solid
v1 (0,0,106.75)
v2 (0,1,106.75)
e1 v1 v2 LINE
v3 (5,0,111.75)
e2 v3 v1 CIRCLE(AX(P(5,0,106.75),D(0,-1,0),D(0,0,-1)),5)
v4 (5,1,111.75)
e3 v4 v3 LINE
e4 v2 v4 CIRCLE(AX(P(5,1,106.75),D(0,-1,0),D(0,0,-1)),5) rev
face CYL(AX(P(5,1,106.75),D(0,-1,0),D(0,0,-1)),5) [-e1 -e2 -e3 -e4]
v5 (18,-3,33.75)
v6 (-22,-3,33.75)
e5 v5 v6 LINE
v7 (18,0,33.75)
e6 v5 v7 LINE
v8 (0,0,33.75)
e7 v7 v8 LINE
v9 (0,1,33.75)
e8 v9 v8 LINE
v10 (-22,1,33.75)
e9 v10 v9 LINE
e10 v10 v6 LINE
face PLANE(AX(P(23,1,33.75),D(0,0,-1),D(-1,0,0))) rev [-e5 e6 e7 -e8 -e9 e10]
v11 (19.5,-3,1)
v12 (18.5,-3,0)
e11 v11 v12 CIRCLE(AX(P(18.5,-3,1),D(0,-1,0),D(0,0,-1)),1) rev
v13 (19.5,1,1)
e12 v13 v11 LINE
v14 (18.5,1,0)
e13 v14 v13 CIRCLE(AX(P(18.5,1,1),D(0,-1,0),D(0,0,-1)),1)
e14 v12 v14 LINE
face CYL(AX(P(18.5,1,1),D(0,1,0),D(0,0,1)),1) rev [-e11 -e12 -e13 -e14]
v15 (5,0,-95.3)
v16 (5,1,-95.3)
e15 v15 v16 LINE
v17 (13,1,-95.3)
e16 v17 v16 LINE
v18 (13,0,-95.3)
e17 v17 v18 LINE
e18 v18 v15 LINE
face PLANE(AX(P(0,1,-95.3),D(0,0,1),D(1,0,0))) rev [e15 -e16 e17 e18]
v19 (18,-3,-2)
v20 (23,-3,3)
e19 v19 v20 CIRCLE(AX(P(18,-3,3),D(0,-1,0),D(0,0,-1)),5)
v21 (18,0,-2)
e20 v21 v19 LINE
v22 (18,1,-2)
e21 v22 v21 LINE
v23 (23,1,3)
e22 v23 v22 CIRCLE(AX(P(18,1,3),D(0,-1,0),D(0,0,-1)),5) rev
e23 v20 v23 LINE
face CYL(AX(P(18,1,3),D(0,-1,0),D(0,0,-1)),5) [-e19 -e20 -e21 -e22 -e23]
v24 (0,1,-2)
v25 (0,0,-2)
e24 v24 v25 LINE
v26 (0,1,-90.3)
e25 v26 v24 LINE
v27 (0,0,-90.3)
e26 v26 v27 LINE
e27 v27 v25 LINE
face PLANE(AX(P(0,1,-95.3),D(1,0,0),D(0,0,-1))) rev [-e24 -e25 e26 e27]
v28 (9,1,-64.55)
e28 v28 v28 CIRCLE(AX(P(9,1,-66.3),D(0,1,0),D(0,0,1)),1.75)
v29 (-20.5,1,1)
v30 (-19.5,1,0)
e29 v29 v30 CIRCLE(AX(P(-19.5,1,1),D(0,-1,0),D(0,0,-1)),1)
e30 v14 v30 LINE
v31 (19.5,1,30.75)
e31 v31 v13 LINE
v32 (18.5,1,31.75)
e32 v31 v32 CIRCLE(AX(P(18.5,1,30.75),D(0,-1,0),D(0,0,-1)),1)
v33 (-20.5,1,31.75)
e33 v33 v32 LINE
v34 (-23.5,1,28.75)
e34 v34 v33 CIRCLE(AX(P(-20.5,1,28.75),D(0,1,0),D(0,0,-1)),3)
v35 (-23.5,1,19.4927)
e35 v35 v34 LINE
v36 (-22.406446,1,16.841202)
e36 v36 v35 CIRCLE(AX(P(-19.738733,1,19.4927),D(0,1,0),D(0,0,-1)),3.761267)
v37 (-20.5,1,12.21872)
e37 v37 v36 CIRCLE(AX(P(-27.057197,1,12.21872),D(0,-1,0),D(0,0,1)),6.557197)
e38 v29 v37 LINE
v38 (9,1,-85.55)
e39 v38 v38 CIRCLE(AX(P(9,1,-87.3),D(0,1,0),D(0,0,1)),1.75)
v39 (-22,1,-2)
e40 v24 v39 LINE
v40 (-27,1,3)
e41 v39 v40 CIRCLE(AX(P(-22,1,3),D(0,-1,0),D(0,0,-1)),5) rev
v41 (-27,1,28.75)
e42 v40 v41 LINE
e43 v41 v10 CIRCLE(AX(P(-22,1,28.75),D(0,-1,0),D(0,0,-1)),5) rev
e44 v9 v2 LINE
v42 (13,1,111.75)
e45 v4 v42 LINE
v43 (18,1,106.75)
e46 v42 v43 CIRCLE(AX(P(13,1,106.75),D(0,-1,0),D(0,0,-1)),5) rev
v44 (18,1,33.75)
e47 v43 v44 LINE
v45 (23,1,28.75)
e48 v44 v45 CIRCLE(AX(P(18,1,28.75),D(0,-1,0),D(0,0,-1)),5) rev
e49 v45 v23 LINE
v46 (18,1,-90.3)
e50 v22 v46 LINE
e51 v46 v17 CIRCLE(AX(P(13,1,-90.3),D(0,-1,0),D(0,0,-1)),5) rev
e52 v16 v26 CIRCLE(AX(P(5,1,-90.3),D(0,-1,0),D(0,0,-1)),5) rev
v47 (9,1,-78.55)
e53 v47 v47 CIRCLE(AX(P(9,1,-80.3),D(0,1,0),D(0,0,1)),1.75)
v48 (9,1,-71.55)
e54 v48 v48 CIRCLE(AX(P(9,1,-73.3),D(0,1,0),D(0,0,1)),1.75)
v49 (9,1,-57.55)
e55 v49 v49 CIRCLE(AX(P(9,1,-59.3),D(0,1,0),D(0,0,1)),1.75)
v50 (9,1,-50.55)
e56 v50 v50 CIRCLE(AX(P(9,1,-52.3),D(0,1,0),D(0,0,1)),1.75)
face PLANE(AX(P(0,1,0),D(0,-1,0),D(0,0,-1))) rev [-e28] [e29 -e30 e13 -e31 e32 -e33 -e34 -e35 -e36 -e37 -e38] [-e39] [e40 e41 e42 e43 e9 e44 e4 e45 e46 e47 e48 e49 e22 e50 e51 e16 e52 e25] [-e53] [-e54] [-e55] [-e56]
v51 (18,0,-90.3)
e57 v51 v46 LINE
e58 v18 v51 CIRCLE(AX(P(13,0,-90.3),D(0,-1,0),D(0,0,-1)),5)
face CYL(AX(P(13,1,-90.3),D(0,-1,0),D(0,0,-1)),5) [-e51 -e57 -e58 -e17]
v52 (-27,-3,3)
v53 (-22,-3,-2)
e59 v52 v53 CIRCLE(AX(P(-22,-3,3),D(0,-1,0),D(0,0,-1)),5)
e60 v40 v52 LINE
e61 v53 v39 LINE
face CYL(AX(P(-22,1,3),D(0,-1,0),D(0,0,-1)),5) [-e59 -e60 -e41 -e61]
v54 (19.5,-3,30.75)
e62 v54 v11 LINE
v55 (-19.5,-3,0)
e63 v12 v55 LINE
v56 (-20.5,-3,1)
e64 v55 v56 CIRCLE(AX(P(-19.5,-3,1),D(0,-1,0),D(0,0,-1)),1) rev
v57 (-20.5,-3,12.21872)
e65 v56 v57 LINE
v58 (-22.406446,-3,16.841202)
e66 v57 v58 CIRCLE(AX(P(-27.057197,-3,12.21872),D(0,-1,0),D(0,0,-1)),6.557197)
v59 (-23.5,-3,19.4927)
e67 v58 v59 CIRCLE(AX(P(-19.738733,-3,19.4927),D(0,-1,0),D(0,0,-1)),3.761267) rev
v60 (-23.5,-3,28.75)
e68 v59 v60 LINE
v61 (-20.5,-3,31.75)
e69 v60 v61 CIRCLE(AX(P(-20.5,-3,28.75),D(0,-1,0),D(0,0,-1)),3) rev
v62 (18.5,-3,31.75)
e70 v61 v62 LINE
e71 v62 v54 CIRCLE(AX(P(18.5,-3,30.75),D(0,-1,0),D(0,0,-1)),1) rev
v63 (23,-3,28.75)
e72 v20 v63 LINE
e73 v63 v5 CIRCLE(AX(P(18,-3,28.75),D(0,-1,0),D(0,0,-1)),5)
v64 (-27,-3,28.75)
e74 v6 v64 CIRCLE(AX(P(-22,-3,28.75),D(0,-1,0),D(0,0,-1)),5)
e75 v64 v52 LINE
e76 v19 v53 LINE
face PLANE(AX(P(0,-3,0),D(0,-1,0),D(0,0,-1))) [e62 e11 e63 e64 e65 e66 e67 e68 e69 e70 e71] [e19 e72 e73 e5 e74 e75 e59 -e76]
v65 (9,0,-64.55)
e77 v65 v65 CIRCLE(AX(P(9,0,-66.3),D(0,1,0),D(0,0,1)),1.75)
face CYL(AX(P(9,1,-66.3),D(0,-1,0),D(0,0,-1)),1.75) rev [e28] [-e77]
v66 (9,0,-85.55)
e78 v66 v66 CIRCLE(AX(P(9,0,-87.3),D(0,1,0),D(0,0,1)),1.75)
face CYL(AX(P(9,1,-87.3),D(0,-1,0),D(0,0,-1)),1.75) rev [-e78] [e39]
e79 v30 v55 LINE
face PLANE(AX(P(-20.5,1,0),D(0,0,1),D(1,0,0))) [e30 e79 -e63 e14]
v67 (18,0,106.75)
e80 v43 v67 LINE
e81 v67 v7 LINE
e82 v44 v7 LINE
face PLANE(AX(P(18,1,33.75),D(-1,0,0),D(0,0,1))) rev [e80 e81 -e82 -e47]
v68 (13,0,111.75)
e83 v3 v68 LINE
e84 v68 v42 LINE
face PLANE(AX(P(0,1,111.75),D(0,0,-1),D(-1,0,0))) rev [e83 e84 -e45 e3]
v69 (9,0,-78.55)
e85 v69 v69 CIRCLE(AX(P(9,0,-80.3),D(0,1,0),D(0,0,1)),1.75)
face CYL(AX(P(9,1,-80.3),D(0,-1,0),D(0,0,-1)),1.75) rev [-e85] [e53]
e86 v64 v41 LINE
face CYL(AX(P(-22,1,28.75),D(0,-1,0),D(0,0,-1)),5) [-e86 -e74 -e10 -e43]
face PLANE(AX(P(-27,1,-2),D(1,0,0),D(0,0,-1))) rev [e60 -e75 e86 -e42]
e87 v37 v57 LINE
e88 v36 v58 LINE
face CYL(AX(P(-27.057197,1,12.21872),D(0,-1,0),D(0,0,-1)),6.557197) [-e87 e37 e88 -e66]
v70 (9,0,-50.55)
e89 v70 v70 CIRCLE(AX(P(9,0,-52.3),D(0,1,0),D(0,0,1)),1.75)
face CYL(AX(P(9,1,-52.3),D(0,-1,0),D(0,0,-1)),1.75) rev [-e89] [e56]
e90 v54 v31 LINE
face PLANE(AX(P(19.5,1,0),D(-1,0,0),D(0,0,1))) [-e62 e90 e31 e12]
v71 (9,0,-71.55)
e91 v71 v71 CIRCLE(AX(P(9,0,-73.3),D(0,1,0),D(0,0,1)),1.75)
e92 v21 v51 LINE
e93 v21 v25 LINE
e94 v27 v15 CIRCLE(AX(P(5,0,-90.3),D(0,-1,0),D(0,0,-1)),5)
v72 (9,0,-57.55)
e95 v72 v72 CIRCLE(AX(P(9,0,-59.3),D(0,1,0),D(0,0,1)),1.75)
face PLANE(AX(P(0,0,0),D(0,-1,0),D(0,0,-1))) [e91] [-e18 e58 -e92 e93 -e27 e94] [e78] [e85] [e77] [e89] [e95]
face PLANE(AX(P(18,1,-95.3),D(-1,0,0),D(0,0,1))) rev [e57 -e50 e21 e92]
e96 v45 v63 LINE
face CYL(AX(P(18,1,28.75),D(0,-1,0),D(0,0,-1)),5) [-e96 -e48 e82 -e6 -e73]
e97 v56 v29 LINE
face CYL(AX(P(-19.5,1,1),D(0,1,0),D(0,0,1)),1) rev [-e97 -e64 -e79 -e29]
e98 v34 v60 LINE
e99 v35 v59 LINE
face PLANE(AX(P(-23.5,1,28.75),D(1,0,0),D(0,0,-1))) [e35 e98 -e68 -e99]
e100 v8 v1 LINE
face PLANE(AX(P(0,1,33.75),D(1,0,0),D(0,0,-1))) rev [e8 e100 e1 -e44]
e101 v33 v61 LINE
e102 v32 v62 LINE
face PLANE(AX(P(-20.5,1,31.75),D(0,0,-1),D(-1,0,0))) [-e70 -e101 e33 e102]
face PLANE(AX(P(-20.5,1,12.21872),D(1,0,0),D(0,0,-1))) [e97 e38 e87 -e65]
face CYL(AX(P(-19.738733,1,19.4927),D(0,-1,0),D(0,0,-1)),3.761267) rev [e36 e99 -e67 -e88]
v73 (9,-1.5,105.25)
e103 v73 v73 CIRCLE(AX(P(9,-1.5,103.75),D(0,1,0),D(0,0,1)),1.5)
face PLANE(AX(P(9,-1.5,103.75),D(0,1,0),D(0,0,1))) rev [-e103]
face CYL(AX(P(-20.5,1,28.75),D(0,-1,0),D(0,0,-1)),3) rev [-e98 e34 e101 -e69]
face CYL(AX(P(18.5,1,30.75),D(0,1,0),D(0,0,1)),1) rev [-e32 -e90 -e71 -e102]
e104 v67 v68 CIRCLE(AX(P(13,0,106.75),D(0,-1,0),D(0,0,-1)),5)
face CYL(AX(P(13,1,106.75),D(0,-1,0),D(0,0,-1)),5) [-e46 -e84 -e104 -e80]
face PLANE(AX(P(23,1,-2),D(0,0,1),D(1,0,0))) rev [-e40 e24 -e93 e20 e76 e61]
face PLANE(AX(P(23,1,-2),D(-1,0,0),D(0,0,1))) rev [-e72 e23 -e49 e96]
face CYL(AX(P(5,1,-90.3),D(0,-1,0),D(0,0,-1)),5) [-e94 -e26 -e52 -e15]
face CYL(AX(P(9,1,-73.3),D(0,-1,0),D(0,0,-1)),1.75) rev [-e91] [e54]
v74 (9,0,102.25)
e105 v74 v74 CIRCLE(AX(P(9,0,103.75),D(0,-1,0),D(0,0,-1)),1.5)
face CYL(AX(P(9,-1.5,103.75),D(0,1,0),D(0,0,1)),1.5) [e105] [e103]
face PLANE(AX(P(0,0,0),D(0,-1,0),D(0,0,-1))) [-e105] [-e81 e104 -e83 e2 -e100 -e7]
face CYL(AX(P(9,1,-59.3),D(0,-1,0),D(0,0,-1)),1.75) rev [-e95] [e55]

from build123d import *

# Parameters (mm, degrees)
SKETCH1_R           = 1.75
BOSS_EXTRUDE1_DEPTH = 1
FILLET1_R           = 5
BOSS_EXTRUDE2_START = 3
SKETCH2_W           = 50
SKETCH2_H           = 35.75
BOSS_EXTRUDE2_DEPTH = 3
FILLET3_R           = 1
SKETCH4_R           = 1.5
BOSS_EXTRUDE3_DEPTH = 2.5
BOSS_EXTRUDE4_START = -1
SKETCH5_R           = 1.75
BOSS_EXTRUDE4_DEPTH = 1
FILLET8_R           = 5


with BuildPart() as part:
    # Sketch1 → Boss-Extrude1 (new body)
    with BuildSketch(Plane(origin=(0, 0, 0), x_dir=(1, 0, 0), z_dir=(0, 1, 0))):
        Polygon((-27, 2), (0, 2), (0, 95.3), (18, 95.3), (18, 2), (23, 2), (23, -33.75), (18, -33.75), (18, -111.75), (0, -111.75), (0, -33.75), (-27, -33.75), align=None)
        with Locations(Location((9, -103.75, 0), (0, 0, 270))):
            Circle(SKETCH1_R, mode=Mode.SUBTRACT)
        with Locations(Location((9, 87.3, 0), (0, 0, 270))):
            Circle(SKETCH1_R, mode=Mode.SUBTRACT)
        with Locations(Location((9, 80.3, 0), (0, 0, 270))):
            Circle(SKETCH1_R, mode=Mode.SUBTRACT)
        with Locations(Location((9, 73.3, 0), (0, 0, 270))):
            Circle(SKETCH1_R, mode=Mode.SUBTRACT)
        with Locations(Location((9, 66.3, 0), (0, 0, 270))):
            Circle(SKETCH1_R, mode=Mode.SUBTRACT)
        with Locations(Location((9, 59.3, 0), (0, 0, 270))):
            Circle(SKETCH1_R, mode=Mode.SUBTRACT)
        with Locations(Location((9, 52.3, 0), (0, 0, 270))):
            Circle(SKETCH1_R, mode=Mode.SUBTRACT)
        with BuildLine():
            Line((-23.5, -28.75), (-23.5, -19.49269966))
            ThreePointArc((-23.5, -19.49269966), (-23.215880477, -18.058623358), (-22.406445692, -16.841202283))
            ThreePointArc((-22.406445692, -16.841202283), (-20.995319195, -14.718813714), (-20.5, -12.218719692))
            Line((-20.5, -12.218719692), (-20.5, 0))
            Line((-20.5, 0), (19.5, 0))
            Line((19.5, 0), (19.5, -31.75))
            Line((19.5, -31.75), (-20.5, -31.75))
            ThreePointArc((-20.5, -31.75), (-22.621320344, -30.871320344), (-23.5, -28.75))
        make_face(mode=Mode.SUBTRACT)
    extrude(amount=BOSS_EXTRUDE1_DEPTH)

    # Fillet1
    fillet1_edges = [part.edges().sort_by_distance(p)[0] for p in [
        (18, 0.5, 111.75),
        (0, 0.5, 111.75),
        (0, 0.5, -95.3),
        (18, 0.5, -95.3),
    ]]
    fillet(fillet1_edges, radius=FILLET1_R)

    # Sketch2 → Boss-Extrude2 (add)
    with BuildSketch(Plane.XZ.offset(BOSS_EXTRUDE2_START)):
        with Locations((-2, 15.875)):
            Rectangle(SKETCH2_W, SKETCH2_H)
        with BuildLine():
            ThreePointArc((-22.406445692, 16.841202283), (-23.215880477, 18.058623358), (-23.5, 19.49269966))
            Line((-23.5, 19.49269966), (-23.5, 28.75))
            ThreePointArc((-23.5, 28.75), (-22.621320344, 30.871320344), (-20.5, 31.75))
            Line((-20.5, 31.75), (19.5, 31.75))
            Line((19.5, 31.75), (19.5, 0))
            Line((19.5, 0), (-20.5, 0))
            Line((-20.5, 0), (-20.5, 12.218719692))
            ThreePointArc((-20.5, 12.218719692), (-20.995319195, 14.718813714), (-22.406445692, 16.841202283))
        make_face(mode=Mode.SUBTRACT)
    extrude(amount=-BOSS_EXTRUDE2_DEPTH)

    # Fillet3
    fillet3_edges = [part.edges().sort_by_distance(p)[0] for p in [
        (-20.5, -1, 0),
        (19.5, -1, 31.75),
        (19.5, -1, 0),
    ]]
    fillet(fillet3_edges, radius=FILLET3_R)



with BuildPart() as body_2:
    # Sketch4 → Boss-Extrude3 (new body)
    with BuildSketch(Plane(origin=(0, 1, 0), x_dir=(1, 0, 0), z_dir=(0, 1, 0))):
        with Locations(Location((9, -103.75, 0), (0, 0, 270))):
            Circle(SKETCH4_R)
    extrude(amount=-BOSS_EXTRUDE3_DEPTH)


with BuildPart() as part_1:
    add(part.part)

    add(body_2.part)  # Boss-Extrude4 merges body 2
    # Sketch5 → Boss-Extrude4 (add)
    with BuildSketch(Plane(origin=(0, 1, 0), x_dir=(1, 0, 0), z_dir=(0, 1, 0)).offset(BOSS_EXTRUDE4_START)):
        with Locations((9, -103.75)):
            Circle(SKETCH5_R)
    extrude(amount=BOSS_EXTRUDE4_DEPTH)

    # Fillet8
    fillet8_edges = [part_1.edges().sort_by_distance(p)[0] for p in [
        (23, -1, -2),
        (23, -1, 33.75),
        (-27, -1, 33.75),
        (-27, -1, -2),
    ]]
    fillet(fillet8_edges, radius=FILLET8_R - 0.0001)  # a hair under: the kernel refuses the full size


solid = part_1.part
